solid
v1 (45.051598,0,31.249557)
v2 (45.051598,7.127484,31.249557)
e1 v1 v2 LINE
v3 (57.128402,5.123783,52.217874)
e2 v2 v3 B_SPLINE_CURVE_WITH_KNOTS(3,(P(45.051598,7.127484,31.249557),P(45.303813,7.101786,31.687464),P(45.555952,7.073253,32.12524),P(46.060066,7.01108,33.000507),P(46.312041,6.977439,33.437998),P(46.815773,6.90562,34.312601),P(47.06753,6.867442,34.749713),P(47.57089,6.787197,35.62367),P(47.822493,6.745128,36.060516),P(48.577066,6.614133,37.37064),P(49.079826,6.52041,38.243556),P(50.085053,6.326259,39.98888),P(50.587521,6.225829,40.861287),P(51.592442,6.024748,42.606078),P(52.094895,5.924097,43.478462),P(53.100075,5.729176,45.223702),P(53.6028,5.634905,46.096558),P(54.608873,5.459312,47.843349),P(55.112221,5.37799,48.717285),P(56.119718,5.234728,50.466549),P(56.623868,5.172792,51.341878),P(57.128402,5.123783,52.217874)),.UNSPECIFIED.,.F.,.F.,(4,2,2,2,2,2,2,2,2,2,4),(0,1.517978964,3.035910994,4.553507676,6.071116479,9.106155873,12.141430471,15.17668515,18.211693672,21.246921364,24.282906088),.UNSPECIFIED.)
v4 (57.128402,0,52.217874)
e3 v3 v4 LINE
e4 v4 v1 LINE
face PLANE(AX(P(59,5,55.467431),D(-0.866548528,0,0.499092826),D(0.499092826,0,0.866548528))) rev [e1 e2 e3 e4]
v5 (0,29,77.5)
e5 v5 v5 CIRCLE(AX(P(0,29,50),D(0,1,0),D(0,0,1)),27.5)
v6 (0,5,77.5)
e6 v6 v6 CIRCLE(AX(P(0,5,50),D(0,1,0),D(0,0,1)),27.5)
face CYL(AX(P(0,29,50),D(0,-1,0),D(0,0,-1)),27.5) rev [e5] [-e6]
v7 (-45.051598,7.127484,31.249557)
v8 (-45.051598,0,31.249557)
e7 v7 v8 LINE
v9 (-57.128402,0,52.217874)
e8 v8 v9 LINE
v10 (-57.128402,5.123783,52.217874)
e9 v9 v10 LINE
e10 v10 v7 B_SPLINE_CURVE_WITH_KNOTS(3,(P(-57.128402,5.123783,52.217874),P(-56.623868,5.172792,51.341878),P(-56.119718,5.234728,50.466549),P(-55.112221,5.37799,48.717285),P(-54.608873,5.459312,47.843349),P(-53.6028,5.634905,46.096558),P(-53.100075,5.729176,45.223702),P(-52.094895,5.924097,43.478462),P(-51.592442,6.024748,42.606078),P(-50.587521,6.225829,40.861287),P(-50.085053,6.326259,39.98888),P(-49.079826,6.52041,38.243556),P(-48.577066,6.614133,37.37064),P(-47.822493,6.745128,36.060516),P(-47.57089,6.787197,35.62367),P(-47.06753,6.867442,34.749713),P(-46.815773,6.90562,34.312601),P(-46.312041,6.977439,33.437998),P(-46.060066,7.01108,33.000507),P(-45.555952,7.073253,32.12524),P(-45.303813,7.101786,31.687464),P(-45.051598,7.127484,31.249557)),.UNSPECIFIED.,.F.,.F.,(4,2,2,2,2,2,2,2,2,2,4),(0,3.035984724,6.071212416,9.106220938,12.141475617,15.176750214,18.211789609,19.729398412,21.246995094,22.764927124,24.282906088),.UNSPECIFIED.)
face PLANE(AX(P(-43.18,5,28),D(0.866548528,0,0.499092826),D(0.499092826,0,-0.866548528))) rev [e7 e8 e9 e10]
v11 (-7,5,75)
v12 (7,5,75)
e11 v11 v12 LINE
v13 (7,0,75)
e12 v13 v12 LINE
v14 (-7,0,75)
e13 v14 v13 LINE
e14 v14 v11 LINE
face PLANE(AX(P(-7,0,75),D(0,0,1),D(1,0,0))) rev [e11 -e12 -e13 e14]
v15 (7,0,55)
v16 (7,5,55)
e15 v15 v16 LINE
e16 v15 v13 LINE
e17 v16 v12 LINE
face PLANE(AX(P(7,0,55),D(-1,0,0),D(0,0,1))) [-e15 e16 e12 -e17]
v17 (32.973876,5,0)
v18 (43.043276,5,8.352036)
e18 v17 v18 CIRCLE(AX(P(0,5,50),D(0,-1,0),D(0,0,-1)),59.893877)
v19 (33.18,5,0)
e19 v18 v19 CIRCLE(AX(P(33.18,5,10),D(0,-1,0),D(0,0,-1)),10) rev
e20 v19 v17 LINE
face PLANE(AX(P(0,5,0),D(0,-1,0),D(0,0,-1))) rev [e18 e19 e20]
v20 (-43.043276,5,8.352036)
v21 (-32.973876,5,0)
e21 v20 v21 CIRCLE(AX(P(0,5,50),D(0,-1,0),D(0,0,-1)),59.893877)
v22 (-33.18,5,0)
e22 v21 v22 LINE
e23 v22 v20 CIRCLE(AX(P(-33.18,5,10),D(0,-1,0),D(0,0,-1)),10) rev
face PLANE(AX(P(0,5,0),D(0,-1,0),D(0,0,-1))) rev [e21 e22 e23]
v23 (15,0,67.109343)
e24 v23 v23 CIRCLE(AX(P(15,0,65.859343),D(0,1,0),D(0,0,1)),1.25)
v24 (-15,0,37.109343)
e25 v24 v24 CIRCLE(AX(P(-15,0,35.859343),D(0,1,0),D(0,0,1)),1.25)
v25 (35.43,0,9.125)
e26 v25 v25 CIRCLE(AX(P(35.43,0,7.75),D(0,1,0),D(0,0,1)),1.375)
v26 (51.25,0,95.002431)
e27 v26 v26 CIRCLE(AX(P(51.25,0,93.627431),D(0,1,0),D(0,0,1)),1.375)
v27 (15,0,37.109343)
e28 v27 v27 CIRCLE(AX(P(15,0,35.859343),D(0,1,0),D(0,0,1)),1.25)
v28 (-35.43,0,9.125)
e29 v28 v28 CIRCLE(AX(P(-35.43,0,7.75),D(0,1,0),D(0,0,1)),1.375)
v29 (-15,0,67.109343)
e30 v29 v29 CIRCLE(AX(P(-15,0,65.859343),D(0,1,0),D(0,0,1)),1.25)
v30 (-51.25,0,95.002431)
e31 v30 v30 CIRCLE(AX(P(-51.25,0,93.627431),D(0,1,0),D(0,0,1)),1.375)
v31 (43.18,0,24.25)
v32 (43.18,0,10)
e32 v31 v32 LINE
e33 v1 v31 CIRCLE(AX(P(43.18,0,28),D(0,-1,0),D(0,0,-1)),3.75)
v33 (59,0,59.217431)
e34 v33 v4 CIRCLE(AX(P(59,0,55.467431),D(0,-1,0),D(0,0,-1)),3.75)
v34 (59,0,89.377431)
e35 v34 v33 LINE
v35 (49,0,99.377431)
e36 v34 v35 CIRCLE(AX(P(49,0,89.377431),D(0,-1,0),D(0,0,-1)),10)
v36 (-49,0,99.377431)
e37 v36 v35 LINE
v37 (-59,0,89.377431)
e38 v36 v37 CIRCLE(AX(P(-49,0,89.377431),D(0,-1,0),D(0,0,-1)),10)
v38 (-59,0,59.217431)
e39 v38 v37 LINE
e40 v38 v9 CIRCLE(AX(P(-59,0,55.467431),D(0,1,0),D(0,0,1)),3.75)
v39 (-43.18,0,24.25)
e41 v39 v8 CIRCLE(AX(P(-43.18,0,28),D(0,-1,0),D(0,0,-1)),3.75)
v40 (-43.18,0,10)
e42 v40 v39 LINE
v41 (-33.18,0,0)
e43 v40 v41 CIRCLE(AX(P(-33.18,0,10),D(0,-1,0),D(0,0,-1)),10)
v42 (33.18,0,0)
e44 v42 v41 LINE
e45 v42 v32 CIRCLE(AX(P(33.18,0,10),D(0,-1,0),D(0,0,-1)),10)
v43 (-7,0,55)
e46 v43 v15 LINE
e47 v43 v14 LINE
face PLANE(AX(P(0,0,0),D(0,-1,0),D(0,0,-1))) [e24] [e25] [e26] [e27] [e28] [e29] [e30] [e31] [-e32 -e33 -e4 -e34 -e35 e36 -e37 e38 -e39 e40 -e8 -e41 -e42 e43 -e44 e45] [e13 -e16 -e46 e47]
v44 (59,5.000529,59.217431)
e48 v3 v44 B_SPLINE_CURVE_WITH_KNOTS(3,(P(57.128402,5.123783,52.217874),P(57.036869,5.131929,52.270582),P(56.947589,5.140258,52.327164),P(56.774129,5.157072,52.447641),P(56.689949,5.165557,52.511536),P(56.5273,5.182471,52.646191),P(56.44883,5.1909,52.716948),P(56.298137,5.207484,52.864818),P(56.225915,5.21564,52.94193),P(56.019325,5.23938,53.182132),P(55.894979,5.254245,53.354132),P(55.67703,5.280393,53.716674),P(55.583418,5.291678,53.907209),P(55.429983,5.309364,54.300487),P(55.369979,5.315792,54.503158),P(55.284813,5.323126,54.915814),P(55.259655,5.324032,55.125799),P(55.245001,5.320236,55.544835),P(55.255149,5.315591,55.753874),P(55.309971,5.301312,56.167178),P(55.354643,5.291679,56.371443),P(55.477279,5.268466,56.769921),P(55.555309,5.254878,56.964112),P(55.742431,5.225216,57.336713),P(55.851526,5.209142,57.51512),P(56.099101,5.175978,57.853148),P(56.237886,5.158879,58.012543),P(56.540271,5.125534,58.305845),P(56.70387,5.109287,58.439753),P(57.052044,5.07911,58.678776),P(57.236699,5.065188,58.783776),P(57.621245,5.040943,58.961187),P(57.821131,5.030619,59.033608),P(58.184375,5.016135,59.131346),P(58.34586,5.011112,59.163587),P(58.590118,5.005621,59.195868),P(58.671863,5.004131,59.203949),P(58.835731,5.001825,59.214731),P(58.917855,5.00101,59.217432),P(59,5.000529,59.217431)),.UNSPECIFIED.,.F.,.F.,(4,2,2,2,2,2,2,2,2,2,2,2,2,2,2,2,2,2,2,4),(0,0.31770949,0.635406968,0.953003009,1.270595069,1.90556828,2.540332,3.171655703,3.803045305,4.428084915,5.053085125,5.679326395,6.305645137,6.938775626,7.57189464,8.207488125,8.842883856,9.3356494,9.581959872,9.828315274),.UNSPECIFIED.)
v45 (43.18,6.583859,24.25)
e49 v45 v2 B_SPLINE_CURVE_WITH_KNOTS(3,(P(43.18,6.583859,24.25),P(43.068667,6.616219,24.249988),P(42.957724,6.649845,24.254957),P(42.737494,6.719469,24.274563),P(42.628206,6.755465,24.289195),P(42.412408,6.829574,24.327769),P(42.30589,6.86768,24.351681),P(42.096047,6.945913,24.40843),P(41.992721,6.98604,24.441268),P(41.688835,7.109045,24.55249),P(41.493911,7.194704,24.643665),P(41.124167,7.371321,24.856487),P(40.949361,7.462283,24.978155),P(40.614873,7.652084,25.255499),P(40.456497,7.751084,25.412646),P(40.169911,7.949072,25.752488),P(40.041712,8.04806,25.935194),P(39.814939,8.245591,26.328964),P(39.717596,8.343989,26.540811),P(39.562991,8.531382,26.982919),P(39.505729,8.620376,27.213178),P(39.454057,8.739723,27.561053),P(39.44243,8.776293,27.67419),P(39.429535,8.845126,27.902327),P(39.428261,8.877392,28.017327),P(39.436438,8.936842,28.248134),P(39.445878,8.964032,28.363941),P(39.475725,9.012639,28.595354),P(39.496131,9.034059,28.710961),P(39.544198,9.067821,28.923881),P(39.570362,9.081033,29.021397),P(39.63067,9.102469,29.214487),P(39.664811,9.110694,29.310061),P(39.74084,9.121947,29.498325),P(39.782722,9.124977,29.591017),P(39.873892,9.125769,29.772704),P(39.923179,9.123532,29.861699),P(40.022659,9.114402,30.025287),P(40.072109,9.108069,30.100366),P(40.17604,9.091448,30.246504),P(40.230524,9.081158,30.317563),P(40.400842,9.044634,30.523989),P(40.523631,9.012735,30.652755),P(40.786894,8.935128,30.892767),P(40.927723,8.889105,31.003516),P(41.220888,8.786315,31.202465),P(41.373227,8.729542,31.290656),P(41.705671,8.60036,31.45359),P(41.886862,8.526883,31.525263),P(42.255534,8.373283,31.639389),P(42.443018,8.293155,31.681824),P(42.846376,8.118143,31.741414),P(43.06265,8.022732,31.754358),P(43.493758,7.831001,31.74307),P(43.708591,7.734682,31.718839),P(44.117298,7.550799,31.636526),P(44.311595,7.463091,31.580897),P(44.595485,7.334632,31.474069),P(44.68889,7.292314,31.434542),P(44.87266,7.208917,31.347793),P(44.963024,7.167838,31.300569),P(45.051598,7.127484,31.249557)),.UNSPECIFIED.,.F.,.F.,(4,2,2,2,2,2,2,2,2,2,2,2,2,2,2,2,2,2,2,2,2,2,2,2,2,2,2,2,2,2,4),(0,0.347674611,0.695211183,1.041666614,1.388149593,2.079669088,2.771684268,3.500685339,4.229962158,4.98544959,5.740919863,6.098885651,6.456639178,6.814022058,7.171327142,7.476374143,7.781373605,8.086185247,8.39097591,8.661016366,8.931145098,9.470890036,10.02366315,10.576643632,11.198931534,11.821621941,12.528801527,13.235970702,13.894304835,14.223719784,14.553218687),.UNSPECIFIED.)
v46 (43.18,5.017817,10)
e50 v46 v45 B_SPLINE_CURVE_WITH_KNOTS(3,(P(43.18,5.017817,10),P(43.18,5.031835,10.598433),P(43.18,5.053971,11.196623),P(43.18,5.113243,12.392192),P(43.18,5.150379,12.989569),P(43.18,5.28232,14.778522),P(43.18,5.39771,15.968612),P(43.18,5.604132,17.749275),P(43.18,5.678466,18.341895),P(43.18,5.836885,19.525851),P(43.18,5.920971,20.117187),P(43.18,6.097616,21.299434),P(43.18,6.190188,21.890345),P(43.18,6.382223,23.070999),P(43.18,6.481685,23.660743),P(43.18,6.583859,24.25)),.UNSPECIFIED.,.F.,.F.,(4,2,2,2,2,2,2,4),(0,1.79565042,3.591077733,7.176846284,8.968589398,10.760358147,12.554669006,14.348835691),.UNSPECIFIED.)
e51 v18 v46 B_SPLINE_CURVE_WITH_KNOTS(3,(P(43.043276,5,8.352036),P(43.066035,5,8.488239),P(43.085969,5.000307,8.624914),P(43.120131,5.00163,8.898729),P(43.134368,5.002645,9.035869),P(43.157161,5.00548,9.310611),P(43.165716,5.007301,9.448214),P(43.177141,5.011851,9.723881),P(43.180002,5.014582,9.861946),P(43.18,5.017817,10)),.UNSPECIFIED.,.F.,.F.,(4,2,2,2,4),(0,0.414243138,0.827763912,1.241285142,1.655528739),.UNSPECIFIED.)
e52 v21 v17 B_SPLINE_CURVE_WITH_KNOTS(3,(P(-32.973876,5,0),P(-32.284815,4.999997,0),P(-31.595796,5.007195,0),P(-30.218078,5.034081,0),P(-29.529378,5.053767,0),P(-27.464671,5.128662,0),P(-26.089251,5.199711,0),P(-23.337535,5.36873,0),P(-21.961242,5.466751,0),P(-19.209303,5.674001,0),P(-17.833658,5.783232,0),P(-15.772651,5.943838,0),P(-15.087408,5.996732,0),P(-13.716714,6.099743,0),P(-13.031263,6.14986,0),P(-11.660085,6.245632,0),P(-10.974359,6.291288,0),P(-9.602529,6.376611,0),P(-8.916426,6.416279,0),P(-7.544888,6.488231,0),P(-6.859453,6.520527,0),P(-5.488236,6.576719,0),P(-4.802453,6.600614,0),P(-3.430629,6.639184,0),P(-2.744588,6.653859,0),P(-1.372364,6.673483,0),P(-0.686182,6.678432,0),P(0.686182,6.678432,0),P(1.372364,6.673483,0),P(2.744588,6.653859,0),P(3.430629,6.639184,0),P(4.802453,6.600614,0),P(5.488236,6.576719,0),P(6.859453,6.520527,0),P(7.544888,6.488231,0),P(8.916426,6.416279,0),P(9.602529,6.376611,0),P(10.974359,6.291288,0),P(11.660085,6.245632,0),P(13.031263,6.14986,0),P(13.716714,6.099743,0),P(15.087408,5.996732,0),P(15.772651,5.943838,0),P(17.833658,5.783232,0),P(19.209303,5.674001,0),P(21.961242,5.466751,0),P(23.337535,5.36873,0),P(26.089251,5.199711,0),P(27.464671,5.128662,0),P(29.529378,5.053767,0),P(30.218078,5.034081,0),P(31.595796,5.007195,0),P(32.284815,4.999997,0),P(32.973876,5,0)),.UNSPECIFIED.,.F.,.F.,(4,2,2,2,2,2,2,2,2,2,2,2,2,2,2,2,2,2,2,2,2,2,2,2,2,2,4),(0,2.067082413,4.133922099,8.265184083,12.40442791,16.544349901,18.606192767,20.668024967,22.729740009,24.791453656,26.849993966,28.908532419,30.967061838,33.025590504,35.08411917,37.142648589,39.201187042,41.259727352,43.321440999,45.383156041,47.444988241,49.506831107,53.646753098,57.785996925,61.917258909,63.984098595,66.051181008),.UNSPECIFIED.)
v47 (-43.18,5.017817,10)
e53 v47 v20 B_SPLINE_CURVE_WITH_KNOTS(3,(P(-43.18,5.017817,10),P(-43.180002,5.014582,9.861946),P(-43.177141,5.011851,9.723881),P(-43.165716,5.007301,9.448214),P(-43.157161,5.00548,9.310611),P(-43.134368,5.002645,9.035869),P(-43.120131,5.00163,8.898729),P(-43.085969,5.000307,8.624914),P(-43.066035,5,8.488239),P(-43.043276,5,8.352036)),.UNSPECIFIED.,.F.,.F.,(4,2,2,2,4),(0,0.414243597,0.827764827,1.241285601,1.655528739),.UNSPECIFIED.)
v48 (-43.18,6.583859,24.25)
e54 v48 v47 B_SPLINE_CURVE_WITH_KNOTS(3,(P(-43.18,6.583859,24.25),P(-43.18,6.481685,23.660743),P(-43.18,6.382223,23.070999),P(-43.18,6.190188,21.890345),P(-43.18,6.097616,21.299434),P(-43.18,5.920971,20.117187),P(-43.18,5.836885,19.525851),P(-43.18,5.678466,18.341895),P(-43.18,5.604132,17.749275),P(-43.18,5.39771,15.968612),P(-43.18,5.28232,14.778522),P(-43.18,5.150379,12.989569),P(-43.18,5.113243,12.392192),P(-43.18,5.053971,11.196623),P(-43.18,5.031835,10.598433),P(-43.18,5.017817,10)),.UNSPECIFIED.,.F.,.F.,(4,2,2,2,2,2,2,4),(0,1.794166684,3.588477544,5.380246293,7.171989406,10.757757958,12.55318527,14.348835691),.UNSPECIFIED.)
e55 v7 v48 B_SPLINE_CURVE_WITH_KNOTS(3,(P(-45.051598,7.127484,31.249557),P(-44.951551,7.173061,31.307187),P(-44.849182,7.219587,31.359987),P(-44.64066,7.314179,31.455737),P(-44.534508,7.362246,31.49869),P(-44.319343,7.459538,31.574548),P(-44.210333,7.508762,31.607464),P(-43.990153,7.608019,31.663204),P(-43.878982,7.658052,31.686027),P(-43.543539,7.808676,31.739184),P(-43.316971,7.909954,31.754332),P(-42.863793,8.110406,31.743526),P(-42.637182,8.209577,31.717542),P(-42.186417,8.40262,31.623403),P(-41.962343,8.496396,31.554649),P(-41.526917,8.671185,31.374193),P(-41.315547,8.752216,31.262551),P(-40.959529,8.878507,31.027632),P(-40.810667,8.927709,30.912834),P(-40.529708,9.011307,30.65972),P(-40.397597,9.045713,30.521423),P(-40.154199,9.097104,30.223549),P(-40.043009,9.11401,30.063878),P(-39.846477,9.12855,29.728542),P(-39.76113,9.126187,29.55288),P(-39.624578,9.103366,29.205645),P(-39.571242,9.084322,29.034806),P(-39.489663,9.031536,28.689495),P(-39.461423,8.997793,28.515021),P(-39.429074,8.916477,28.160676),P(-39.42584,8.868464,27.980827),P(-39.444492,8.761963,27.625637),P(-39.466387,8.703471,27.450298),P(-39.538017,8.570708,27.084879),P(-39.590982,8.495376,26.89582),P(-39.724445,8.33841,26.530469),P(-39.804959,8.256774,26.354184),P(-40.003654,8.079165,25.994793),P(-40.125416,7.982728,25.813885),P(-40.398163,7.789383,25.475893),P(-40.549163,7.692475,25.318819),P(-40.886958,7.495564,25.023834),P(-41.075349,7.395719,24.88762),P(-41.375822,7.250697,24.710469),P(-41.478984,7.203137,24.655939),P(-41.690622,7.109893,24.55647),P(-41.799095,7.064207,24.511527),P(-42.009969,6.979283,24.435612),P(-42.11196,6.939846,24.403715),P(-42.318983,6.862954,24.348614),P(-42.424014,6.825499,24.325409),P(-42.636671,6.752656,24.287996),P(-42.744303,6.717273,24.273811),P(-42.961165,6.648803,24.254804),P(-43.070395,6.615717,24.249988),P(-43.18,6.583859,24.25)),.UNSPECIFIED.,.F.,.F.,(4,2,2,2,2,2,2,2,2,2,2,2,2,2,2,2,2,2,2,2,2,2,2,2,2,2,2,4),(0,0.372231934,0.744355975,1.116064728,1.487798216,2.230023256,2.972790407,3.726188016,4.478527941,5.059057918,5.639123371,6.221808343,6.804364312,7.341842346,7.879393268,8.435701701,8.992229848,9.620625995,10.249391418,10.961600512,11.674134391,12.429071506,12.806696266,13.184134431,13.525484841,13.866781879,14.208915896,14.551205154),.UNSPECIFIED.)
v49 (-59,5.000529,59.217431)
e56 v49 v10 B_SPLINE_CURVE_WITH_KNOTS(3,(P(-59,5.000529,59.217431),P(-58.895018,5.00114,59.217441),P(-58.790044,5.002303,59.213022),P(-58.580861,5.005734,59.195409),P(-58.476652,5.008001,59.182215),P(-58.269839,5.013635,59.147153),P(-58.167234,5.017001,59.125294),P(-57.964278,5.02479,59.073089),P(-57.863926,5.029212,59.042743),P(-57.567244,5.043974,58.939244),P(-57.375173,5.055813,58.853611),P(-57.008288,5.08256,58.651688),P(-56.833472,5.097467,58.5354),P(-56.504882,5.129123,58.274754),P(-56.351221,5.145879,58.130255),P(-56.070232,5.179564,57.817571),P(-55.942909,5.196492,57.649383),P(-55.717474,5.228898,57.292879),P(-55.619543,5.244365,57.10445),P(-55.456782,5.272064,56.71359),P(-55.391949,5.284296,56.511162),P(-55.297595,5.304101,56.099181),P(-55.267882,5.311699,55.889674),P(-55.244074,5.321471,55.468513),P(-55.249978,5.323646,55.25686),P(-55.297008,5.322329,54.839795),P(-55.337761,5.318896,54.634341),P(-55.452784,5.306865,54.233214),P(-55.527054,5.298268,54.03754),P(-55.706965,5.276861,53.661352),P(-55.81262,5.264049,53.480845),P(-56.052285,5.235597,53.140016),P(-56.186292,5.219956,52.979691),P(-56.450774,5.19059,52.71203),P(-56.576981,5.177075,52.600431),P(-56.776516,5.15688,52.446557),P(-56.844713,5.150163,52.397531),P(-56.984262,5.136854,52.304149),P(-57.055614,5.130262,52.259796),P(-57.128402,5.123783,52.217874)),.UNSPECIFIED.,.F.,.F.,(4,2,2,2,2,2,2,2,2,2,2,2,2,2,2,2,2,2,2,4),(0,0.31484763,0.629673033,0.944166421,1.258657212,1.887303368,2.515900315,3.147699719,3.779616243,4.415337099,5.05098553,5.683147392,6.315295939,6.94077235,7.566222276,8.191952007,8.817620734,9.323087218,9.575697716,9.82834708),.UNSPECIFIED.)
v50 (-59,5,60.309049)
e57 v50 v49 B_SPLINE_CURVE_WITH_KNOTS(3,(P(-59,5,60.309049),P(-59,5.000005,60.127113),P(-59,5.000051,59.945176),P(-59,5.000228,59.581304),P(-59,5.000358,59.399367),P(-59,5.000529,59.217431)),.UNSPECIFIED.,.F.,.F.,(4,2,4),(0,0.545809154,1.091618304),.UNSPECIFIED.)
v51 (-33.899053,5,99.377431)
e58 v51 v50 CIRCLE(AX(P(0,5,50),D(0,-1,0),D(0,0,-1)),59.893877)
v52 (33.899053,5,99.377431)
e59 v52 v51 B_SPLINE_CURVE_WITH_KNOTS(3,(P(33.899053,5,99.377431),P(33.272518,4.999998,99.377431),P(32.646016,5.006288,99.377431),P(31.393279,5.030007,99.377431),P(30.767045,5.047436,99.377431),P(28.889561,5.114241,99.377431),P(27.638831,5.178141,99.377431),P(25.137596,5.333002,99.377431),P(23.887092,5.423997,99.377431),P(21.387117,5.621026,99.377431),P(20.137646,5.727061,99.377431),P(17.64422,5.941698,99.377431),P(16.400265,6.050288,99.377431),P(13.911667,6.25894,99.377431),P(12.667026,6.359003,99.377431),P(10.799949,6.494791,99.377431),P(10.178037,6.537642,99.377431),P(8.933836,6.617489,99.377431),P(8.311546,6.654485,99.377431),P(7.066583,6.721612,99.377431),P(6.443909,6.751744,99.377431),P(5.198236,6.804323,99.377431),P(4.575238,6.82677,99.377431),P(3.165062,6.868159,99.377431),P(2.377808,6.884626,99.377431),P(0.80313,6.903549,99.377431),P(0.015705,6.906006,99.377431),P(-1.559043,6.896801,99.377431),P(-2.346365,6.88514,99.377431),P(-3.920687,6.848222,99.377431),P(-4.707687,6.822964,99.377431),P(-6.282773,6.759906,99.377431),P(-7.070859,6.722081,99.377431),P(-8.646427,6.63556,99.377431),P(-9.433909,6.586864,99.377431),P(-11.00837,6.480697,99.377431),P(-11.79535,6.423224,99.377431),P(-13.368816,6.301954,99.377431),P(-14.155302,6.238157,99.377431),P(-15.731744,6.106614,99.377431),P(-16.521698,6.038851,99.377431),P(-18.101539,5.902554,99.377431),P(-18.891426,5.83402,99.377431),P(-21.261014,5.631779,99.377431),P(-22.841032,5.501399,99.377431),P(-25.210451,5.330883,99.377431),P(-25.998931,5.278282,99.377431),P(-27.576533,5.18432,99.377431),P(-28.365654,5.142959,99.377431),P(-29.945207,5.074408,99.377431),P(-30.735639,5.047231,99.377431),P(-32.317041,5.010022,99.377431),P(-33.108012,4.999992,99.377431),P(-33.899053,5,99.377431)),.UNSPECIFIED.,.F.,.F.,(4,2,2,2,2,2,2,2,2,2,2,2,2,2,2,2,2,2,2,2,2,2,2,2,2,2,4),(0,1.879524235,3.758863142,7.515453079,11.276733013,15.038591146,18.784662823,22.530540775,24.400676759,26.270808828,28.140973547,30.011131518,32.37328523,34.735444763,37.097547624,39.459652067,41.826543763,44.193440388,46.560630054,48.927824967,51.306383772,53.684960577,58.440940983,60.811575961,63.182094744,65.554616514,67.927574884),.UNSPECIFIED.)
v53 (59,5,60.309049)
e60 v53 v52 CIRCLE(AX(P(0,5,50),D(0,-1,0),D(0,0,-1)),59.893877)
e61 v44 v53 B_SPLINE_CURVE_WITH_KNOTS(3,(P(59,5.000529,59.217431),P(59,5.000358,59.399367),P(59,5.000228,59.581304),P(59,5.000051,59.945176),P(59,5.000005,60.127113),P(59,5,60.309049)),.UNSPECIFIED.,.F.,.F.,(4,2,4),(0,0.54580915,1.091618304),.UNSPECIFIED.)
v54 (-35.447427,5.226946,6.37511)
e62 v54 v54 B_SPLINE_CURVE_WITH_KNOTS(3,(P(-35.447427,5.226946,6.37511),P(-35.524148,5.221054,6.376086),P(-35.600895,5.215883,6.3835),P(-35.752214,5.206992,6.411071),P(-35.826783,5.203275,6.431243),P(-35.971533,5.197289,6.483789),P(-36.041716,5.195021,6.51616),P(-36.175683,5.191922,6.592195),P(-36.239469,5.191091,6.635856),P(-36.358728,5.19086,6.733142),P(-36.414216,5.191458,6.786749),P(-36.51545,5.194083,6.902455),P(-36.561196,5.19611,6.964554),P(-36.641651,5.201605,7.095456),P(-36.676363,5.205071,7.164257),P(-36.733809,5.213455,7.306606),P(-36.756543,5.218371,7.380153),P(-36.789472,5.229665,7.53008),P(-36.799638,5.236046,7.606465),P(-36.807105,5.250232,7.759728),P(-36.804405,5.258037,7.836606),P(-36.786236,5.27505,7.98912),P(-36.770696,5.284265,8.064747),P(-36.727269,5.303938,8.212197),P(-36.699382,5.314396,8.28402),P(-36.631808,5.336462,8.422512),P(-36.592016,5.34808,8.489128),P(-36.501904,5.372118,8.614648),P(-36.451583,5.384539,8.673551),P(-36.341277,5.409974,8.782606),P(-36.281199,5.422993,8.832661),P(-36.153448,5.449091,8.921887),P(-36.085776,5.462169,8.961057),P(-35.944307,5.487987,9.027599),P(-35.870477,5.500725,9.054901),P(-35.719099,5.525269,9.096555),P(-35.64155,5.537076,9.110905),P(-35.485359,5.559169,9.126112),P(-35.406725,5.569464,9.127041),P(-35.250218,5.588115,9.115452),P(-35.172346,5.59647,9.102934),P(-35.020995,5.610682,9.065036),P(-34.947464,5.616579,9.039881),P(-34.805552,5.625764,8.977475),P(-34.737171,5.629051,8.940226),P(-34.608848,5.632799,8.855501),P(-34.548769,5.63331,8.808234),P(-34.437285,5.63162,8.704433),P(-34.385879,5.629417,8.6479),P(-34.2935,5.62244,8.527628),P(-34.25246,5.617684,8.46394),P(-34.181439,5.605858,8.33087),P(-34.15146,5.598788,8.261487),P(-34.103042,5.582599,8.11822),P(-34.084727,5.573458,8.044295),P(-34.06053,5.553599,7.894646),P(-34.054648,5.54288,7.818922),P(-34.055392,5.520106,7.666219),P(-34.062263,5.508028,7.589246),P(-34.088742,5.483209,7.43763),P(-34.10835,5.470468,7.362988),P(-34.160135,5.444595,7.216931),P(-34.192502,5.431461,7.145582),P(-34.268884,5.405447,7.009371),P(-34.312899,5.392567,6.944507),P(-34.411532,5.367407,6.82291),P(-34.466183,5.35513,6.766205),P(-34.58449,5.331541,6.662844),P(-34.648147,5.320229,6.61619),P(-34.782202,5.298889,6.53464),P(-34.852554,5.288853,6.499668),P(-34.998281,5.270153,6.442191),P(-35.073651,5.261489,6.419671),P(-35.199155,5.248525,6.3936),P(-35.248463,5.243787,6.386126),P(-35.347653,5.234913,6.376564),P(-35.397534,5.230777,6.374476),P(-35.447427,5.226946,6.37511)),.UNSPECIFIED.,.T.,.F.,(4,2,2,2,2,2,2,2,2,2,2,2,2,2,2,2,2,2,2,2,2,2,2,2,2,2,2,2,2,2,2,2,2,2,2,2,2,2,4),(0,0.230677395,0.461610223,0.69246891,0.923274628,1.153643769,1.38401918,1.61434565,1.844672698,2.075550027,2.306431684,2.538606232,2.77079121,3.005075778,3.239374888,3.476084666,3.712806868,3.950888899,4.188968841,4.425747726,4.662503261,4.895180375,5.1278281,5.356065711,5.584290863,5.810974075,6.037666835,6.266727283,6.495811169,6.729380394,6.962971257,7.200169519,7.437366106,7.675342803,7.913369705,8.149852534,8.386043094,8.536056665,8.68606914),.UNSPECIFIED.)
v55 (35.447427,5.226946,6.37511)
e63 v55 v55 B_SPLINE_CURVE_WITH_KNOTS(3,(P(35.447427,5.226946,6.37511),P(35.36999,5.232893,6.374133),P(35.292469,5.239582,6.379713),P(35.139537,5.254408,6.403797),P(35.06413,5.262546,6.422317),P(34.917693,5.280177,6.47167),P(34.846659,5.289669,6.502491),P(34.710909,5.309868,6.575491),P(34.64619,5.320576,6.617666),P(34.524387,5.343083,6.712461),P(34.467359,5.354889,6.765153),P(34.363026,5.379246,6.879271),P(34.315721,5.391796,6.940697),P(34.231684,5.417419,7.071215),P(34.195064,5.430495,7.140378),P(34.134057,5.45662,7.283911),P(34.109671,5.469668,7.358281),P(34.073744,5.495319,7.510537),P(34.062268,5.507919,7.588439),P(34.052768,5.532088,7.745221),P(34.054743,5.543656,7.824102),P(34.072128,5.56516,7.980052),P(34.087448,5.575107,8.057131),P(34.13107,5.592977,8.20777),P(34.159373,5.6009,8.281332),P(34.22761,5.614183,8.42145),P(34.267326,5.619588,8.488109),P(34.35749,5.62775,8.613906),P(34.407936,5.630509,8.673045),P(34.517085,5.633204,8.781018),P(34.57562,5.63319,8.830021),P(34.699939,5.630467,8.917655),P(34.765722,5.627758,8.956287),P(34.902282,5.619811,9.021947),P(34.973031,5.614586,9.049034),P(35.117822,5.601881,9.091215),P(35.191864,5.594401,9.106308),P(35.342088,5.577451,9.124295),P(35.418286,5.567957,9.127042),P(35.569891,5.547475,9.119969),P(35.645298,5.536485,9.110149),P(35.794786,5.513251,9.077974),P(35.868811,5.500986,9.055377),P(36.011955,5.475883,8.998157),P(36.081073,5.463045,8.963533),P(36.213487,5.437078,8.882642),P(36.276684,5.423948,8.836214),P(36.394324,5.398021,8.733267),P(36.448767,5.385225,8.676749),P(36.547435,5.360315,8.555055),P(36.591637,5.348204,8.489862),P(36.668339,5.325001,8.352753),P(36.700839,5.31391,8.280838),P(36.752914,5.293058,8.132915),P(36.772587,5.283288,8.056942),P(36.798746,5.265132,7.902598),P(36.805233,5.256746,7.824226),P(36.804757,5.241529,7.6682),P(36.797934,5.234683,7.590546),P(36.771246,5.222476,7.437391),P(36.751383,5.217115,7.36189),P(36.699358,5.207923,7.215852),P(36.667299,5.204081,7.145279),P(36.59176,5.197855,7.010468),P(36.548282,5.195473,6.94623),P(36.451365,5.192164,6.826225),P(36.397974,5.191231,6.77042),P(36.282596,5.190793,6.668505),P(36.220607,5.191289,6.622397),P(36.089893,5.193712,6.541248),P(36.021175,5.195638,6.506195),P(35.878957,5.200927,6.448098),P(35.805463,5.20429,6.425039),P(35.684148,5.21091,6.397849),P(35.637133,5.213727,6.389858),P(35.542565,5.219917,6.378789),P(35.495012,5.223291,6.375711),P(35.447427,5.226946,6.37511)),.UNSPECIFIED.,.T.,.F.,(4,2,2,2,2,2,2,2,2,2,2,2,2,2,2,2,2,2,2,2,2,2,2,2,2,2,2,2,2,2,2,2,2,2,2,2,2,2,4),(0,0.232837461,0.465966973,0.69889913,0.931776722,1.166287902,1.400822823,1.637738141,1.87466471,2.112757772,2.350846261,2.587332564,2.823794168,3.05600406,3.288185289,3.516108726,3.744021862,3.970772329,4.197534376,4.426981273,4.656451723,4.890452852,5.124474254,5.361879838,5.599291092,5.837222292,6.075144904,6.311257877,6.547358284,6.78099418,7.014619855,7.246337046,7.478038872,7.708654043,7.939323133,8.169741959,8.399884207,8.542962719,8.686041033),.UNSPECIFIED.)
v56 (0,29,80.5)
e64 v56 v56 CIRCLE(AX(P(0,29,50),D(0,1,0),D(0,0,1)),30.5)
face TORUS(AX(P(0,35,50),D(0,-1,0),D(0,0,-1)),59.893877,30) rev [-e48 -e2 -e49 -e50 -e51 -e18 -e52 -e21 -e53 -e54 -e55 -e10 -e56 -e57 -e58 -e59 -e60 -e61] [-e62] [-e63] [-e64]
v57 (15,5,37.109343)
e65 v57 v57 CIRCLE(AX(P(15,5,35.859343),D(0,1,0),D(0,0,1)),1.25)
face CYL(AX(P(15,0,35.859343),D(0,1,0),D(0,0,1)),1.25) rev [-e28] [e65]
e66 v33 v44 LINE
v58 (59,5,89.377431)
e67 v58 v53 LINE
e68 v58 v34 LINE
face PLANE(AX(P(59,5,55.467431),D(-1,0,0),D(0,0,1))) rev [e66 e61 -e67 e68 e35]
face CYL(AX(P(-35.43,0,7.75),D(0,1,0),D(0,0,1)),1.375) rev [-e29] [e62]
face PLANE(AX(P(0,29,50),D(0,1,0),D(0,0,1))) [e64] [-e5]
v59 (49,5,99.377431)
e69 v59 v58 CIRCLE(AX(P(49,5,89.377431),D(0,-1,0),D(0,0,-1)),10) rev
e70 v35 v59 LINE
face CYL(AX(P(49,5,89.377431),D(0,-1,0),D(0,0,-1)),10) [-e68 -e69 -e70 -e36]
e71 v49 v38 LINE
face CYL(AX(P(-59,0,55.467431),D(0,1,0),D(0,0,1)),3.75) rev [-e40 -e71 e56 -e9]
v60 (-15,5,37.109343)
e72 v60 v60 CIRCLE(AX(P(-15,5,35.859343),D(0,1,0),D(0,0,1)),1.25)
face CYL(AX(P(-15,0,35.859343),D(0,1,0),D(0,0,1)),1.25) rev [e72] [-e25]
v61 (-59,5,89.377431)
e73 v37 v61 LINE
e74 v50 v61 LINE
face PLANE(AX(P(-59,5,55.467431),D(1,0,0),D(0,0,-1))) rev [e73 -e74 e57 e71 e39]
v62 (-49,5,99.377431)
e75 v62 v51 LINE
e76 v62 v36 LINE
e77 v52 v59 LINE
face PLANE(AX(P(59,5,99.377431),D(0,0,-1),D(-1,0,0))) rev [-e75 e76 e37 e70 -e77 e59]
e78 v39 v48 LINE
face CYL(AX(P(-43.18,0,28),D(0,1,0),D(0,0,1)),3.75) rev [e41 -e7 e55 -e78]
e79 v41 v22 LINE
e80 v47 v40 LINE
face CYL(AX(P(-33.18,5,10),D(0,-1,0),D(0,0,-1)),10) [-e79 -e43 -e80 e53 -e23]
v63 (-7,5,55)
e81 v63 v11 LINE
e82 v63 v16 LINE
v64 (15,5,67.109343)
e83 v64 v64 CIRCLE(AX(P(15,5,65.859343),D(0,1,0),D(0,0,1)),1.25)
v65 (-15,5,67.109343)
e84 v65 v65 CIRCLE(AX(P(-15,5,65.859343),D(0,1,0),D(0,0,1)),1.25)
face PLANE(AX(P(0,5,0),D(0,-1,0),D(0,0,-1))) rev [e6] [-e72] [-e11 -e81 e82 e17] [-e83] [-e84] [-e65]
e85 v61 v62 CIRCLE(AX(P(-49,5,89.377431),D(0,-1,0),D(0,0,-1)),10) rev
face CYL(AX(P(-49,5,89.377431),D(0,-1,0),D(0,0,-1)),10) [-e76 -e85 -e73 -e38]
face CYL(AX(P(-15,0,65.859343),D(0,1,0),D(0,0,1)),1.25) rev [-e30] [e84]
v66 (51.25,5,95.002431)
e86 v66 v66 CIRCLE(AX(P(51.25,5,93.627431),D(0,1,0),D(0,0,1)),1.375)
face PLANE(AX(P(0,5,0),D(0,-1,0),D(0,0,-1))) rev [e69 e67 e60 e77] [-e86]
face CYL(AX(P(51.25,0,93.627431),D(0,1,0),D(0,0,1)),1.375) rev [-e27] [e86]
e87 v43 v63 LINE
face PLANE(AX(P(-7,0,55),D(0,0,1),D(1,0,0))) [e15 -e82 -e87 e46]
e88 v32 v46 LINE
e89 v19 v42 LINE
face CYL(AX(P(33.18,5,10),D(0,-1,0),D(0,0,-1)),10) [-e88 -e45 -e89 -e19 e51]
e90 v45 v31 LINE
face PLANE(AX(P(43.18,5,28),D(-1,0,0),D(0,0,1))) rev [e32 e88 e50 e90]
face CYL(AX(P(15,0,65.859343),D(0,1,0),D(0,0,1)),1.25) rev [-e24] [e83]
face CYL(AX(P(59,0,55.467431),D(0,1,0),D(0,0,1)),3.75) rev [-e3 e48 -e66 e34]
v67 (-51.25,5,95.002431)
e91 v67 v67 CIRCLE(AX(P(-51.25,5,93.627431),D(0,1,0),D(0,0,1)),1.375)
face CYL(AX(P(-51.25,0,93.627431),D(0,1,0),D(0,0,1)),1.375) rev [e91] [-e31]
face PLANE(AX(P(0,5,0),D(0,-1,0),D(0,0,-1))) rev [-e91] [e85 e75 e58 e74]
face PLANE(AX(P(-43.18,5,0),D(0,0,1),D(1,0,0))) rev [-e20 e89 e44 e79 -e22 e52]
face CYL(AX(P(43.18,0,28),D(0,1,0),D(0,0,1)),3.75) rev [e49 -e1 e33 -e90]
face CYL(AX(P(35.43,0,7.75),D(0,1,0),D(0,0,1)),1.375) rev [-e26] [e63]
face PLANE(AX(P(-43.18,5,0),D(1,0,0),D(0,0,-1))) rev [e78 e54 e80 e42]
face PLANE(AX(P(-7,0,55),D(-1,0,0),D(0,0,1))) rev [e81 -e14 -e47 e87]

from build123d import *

# Parameters (mm, degrees)
BOSS_EXTRUDE1_DEPTH = 5
FILLET1_R           = 10
SKETCH2_R           = 1.375
SKETCH2_R_2         = 3.75
CUT_EXTRUDE1_DEPTH  = 116.680049132
SKETCH3_R           = 1.25
SKETCH3_W           = 14
SKETCH3_H           = 20
CUT_EXTRUDE2_DEPTH  = 5
SKETCH5_R           = 30.5
SKETCH5_R_2         = 27.5
BOSS_EXTRUDE2_DEPTH = 24
FILLET2_START       = 5
FILLET2_2_OUTLINE_R = 1.375
FILLET2_2_DEPTH     = 4.125417965
FILLET3_R           = 10


with BuildPart() as part:
    # Sketch1 → Boss-Extrude1 (new body)
    with BuildSketch(Plane(origin=(0, 0, 0), x_dir=(1, 0, 0), z_dir=(0, 1, 0))):
        Polygon((-43.18, 0), (43.18, 0), (43.18, -28), (59, -55.467430874), (59, -99.377430874), (-59, -99.377430874), (-59, -55.467430874), (-43.18, -28), align=None)
    extrude(amount=BOSS_EXTRUDE1_DEPTH)

    # Fillet1
    fillet1_edges = [part.edges().sort_by_distance(p)[0] for p in [
        (-43.18, 2.5, 0),
        (43.18, 2.5, 0),
    ]]
    fillet(fillet1_edges, radius=FILLET1_R)

    # Sketch2 → Cut-Extrude1 (cut, through all)
    with BuildSketch(Plane(origin=(0, 5, 0), x_dir=(1, 0, 0), z_dir=(0, 1, 0))):
        with Locations(Location((-51.25, -93.627430874, 0), (0, 0, 270))):
            Circle(SKETCH2_R)
        with Locations(Location((-35.43, -7.75, 0), (0, 0, 270))):
            Circle(SKETCH2_R)
        with Locations(Location((35.43, -7.75, 0), (0, 0, 270))):
            Circle(SKETCH2_R)
        with Locations(Location((51.25, -93.627430874, 0), (0, 0, 270))):
            Circle(SKETCH2_R)
        with Locations((-59, -55.467430874)):
            Circle(SKETCH2_R_2)
        with Locations((-43.18, -28)):
            Circle(SKETCH2_R_2)
        with Locations((43.18, -28)):
            Circle(SKETCH2_R_2)
        with Locations((59, -55.467430874)):
            Circle(SKETCH2_R_2)
    extrude(amount=-CUT_EXTRUDE1_DEPTH, mode=Mode.SUBTRACT)

    # Sketch3 → Cut-Extrude2 (cut)
    with BuildSketch(Plane(origin=(0, 5, 0), x_dir=(1, 0, 0), z_dir=(0, 1, 0))):
        with Locations(Location((-15, -35.859343003, 0), (0, 0, 270))):
            Circle(SKETCH3_R)
        with Locations(Location((15, -35.859343003, 0), (0, 0, 270))):
            Circle(SKETCH3_R)
        with Locations(Location((15, -65.859343003, 0), (0, 0, 270))):
            Circle(SKETCH3_R)
        with Locations(Location((-15, -65.859343003, 0), (0, 0, 270))):
            Circle(SKETCH3_R)
        with Locations((0, -65)):
            Rectangle(SKETCH3_W, SKETCH3_H)
    extrude(amount=-CUT_EXTRUDE2_DEPTH, mode=Mode.SUBTRACT)

    # Sketch5 → Boss-Extrude2 (add)
    with BuildSketch(Plane(origin=(0, 5, 0), x_dir=(1, 0, 0), z_dir=(0, 1, 0))):
        with Locations(Location((0, -50, 0), (0, 0, 90))):
            Circle(SKETCH5_R)
        with Locations(Location((0, -50, 0), (0, 0, 270))):
            Circle(SKETCH5_R_2, mode=Mode.SUBTRACT)
    extrude(amount=BOSS_EXTRUDE2_DEPTH)

    # Fillet2: read off the stored shape, not the designer's step
    # Fillet2 outline → Fillet2 (revolve)
    with BuildSketch(Plane.XY.offset(50)):
        with BuildLine():
            Line((30.5, 5), (59.893876913, 5))
            ThreePointArc((59.893876913, 5), (40.920210952, 11.762099923), (30.5, 29))
            Line((30.5, 29), (30.5, 5))
        make_face()
    revolve(axis=Axis((0, 0, 50), (0, 1, 0)))

    # Fillet2 2 outline → Fillet2 2 (cut)
    with BuildSketch(Plane(origin=(0, 0, 0), x_dir=(1, 0, 0), z_dir=(0, 1, 0)).offset(FILLET2_START)):
        with Locations((35.43, -7.75)):
            Circle(FILLET2_2_OUTLINE_R)
        with Locations((-35.43, -7.75)):
            Circle(FILLET2_2_OUTLINE_R)
        with BuildLine():
            Line((33.899053261, -99.377430874), (-33.899053261, -99.377430874))
            ThreePointArc((-33.899053261, -99.377430874), (0, -109.893876913), (33.899053261, -99.377430874))
        make_face()
        with BuildLine():
            ThreePointArc((-43.043276128, -8.352036402), (-57.254609777, -32.416310088), (-59, -60.309049019))
            Line((-59, -60.309049019), (-59, -59.217430874))
            ThreePointArc((-59, -59.217430874), (-55.377270458, -56.436105569), (-57.128401901, -52.217873895))
            Line((-57.128401901, -52.217873895), (-45.051598099, -31.249556979))
            ThreePointArc((-45.051598099, -31.249556979), (-39.557270458, -28.968674695), (-43.18, -24.25))
            Line((-43.18, -24.25), (-43.18, -10))
            ThreePointArc((-43.18, -10), (-43.145760415, -9.173187229), (-43.043276128, -8.352036402))
        make_face()
        with BuildLine():
            ThreePointArc((32.973875897, 0), (0, 9.893876913), (-32.973875897, 0))
            Line((-32.973875897, 0), (32.973875897, 0))
        make_face()
        with BuildLine():
            ThreePointArc((59, -60.309049019), (57.254609777, -32.416310088), (43.043276128, -8.352036402))
            ThreePointArc((43.043276128, -8.352036402), (43.145760415, -9.173187229), (43.18, -10))
            Line((43.18, -10), (43.18, -24.25))
            ThreePointArc((43.18, -24.25), (39.557270458, -28.968674695), (45.051598099, -31.249556979))
            Line((45.051598099, -31.249556979), (57.128401901, -52.217873895))
            ThreePointArc((57.128401901, -52.217873895), (55.377270458, -56.436105569), (59, -59.217430874))
            Line((59, -59.217430874), (59, -60.309049019))
        make_face()
    extrude(amount=FILLET2_2_DEPTH, mode=Mode.SUBTRACT)

    # Fillet3
    fillet3_edges = [part.edges().sort_by_distance(p)[0] for p in [
        (59, 2.5, 99.377430874),
        (-59, 2.5, 99.377430874),
    ]]
    fillet(fillet3_edges, radius=FILLET3_R)


solid = part.part
